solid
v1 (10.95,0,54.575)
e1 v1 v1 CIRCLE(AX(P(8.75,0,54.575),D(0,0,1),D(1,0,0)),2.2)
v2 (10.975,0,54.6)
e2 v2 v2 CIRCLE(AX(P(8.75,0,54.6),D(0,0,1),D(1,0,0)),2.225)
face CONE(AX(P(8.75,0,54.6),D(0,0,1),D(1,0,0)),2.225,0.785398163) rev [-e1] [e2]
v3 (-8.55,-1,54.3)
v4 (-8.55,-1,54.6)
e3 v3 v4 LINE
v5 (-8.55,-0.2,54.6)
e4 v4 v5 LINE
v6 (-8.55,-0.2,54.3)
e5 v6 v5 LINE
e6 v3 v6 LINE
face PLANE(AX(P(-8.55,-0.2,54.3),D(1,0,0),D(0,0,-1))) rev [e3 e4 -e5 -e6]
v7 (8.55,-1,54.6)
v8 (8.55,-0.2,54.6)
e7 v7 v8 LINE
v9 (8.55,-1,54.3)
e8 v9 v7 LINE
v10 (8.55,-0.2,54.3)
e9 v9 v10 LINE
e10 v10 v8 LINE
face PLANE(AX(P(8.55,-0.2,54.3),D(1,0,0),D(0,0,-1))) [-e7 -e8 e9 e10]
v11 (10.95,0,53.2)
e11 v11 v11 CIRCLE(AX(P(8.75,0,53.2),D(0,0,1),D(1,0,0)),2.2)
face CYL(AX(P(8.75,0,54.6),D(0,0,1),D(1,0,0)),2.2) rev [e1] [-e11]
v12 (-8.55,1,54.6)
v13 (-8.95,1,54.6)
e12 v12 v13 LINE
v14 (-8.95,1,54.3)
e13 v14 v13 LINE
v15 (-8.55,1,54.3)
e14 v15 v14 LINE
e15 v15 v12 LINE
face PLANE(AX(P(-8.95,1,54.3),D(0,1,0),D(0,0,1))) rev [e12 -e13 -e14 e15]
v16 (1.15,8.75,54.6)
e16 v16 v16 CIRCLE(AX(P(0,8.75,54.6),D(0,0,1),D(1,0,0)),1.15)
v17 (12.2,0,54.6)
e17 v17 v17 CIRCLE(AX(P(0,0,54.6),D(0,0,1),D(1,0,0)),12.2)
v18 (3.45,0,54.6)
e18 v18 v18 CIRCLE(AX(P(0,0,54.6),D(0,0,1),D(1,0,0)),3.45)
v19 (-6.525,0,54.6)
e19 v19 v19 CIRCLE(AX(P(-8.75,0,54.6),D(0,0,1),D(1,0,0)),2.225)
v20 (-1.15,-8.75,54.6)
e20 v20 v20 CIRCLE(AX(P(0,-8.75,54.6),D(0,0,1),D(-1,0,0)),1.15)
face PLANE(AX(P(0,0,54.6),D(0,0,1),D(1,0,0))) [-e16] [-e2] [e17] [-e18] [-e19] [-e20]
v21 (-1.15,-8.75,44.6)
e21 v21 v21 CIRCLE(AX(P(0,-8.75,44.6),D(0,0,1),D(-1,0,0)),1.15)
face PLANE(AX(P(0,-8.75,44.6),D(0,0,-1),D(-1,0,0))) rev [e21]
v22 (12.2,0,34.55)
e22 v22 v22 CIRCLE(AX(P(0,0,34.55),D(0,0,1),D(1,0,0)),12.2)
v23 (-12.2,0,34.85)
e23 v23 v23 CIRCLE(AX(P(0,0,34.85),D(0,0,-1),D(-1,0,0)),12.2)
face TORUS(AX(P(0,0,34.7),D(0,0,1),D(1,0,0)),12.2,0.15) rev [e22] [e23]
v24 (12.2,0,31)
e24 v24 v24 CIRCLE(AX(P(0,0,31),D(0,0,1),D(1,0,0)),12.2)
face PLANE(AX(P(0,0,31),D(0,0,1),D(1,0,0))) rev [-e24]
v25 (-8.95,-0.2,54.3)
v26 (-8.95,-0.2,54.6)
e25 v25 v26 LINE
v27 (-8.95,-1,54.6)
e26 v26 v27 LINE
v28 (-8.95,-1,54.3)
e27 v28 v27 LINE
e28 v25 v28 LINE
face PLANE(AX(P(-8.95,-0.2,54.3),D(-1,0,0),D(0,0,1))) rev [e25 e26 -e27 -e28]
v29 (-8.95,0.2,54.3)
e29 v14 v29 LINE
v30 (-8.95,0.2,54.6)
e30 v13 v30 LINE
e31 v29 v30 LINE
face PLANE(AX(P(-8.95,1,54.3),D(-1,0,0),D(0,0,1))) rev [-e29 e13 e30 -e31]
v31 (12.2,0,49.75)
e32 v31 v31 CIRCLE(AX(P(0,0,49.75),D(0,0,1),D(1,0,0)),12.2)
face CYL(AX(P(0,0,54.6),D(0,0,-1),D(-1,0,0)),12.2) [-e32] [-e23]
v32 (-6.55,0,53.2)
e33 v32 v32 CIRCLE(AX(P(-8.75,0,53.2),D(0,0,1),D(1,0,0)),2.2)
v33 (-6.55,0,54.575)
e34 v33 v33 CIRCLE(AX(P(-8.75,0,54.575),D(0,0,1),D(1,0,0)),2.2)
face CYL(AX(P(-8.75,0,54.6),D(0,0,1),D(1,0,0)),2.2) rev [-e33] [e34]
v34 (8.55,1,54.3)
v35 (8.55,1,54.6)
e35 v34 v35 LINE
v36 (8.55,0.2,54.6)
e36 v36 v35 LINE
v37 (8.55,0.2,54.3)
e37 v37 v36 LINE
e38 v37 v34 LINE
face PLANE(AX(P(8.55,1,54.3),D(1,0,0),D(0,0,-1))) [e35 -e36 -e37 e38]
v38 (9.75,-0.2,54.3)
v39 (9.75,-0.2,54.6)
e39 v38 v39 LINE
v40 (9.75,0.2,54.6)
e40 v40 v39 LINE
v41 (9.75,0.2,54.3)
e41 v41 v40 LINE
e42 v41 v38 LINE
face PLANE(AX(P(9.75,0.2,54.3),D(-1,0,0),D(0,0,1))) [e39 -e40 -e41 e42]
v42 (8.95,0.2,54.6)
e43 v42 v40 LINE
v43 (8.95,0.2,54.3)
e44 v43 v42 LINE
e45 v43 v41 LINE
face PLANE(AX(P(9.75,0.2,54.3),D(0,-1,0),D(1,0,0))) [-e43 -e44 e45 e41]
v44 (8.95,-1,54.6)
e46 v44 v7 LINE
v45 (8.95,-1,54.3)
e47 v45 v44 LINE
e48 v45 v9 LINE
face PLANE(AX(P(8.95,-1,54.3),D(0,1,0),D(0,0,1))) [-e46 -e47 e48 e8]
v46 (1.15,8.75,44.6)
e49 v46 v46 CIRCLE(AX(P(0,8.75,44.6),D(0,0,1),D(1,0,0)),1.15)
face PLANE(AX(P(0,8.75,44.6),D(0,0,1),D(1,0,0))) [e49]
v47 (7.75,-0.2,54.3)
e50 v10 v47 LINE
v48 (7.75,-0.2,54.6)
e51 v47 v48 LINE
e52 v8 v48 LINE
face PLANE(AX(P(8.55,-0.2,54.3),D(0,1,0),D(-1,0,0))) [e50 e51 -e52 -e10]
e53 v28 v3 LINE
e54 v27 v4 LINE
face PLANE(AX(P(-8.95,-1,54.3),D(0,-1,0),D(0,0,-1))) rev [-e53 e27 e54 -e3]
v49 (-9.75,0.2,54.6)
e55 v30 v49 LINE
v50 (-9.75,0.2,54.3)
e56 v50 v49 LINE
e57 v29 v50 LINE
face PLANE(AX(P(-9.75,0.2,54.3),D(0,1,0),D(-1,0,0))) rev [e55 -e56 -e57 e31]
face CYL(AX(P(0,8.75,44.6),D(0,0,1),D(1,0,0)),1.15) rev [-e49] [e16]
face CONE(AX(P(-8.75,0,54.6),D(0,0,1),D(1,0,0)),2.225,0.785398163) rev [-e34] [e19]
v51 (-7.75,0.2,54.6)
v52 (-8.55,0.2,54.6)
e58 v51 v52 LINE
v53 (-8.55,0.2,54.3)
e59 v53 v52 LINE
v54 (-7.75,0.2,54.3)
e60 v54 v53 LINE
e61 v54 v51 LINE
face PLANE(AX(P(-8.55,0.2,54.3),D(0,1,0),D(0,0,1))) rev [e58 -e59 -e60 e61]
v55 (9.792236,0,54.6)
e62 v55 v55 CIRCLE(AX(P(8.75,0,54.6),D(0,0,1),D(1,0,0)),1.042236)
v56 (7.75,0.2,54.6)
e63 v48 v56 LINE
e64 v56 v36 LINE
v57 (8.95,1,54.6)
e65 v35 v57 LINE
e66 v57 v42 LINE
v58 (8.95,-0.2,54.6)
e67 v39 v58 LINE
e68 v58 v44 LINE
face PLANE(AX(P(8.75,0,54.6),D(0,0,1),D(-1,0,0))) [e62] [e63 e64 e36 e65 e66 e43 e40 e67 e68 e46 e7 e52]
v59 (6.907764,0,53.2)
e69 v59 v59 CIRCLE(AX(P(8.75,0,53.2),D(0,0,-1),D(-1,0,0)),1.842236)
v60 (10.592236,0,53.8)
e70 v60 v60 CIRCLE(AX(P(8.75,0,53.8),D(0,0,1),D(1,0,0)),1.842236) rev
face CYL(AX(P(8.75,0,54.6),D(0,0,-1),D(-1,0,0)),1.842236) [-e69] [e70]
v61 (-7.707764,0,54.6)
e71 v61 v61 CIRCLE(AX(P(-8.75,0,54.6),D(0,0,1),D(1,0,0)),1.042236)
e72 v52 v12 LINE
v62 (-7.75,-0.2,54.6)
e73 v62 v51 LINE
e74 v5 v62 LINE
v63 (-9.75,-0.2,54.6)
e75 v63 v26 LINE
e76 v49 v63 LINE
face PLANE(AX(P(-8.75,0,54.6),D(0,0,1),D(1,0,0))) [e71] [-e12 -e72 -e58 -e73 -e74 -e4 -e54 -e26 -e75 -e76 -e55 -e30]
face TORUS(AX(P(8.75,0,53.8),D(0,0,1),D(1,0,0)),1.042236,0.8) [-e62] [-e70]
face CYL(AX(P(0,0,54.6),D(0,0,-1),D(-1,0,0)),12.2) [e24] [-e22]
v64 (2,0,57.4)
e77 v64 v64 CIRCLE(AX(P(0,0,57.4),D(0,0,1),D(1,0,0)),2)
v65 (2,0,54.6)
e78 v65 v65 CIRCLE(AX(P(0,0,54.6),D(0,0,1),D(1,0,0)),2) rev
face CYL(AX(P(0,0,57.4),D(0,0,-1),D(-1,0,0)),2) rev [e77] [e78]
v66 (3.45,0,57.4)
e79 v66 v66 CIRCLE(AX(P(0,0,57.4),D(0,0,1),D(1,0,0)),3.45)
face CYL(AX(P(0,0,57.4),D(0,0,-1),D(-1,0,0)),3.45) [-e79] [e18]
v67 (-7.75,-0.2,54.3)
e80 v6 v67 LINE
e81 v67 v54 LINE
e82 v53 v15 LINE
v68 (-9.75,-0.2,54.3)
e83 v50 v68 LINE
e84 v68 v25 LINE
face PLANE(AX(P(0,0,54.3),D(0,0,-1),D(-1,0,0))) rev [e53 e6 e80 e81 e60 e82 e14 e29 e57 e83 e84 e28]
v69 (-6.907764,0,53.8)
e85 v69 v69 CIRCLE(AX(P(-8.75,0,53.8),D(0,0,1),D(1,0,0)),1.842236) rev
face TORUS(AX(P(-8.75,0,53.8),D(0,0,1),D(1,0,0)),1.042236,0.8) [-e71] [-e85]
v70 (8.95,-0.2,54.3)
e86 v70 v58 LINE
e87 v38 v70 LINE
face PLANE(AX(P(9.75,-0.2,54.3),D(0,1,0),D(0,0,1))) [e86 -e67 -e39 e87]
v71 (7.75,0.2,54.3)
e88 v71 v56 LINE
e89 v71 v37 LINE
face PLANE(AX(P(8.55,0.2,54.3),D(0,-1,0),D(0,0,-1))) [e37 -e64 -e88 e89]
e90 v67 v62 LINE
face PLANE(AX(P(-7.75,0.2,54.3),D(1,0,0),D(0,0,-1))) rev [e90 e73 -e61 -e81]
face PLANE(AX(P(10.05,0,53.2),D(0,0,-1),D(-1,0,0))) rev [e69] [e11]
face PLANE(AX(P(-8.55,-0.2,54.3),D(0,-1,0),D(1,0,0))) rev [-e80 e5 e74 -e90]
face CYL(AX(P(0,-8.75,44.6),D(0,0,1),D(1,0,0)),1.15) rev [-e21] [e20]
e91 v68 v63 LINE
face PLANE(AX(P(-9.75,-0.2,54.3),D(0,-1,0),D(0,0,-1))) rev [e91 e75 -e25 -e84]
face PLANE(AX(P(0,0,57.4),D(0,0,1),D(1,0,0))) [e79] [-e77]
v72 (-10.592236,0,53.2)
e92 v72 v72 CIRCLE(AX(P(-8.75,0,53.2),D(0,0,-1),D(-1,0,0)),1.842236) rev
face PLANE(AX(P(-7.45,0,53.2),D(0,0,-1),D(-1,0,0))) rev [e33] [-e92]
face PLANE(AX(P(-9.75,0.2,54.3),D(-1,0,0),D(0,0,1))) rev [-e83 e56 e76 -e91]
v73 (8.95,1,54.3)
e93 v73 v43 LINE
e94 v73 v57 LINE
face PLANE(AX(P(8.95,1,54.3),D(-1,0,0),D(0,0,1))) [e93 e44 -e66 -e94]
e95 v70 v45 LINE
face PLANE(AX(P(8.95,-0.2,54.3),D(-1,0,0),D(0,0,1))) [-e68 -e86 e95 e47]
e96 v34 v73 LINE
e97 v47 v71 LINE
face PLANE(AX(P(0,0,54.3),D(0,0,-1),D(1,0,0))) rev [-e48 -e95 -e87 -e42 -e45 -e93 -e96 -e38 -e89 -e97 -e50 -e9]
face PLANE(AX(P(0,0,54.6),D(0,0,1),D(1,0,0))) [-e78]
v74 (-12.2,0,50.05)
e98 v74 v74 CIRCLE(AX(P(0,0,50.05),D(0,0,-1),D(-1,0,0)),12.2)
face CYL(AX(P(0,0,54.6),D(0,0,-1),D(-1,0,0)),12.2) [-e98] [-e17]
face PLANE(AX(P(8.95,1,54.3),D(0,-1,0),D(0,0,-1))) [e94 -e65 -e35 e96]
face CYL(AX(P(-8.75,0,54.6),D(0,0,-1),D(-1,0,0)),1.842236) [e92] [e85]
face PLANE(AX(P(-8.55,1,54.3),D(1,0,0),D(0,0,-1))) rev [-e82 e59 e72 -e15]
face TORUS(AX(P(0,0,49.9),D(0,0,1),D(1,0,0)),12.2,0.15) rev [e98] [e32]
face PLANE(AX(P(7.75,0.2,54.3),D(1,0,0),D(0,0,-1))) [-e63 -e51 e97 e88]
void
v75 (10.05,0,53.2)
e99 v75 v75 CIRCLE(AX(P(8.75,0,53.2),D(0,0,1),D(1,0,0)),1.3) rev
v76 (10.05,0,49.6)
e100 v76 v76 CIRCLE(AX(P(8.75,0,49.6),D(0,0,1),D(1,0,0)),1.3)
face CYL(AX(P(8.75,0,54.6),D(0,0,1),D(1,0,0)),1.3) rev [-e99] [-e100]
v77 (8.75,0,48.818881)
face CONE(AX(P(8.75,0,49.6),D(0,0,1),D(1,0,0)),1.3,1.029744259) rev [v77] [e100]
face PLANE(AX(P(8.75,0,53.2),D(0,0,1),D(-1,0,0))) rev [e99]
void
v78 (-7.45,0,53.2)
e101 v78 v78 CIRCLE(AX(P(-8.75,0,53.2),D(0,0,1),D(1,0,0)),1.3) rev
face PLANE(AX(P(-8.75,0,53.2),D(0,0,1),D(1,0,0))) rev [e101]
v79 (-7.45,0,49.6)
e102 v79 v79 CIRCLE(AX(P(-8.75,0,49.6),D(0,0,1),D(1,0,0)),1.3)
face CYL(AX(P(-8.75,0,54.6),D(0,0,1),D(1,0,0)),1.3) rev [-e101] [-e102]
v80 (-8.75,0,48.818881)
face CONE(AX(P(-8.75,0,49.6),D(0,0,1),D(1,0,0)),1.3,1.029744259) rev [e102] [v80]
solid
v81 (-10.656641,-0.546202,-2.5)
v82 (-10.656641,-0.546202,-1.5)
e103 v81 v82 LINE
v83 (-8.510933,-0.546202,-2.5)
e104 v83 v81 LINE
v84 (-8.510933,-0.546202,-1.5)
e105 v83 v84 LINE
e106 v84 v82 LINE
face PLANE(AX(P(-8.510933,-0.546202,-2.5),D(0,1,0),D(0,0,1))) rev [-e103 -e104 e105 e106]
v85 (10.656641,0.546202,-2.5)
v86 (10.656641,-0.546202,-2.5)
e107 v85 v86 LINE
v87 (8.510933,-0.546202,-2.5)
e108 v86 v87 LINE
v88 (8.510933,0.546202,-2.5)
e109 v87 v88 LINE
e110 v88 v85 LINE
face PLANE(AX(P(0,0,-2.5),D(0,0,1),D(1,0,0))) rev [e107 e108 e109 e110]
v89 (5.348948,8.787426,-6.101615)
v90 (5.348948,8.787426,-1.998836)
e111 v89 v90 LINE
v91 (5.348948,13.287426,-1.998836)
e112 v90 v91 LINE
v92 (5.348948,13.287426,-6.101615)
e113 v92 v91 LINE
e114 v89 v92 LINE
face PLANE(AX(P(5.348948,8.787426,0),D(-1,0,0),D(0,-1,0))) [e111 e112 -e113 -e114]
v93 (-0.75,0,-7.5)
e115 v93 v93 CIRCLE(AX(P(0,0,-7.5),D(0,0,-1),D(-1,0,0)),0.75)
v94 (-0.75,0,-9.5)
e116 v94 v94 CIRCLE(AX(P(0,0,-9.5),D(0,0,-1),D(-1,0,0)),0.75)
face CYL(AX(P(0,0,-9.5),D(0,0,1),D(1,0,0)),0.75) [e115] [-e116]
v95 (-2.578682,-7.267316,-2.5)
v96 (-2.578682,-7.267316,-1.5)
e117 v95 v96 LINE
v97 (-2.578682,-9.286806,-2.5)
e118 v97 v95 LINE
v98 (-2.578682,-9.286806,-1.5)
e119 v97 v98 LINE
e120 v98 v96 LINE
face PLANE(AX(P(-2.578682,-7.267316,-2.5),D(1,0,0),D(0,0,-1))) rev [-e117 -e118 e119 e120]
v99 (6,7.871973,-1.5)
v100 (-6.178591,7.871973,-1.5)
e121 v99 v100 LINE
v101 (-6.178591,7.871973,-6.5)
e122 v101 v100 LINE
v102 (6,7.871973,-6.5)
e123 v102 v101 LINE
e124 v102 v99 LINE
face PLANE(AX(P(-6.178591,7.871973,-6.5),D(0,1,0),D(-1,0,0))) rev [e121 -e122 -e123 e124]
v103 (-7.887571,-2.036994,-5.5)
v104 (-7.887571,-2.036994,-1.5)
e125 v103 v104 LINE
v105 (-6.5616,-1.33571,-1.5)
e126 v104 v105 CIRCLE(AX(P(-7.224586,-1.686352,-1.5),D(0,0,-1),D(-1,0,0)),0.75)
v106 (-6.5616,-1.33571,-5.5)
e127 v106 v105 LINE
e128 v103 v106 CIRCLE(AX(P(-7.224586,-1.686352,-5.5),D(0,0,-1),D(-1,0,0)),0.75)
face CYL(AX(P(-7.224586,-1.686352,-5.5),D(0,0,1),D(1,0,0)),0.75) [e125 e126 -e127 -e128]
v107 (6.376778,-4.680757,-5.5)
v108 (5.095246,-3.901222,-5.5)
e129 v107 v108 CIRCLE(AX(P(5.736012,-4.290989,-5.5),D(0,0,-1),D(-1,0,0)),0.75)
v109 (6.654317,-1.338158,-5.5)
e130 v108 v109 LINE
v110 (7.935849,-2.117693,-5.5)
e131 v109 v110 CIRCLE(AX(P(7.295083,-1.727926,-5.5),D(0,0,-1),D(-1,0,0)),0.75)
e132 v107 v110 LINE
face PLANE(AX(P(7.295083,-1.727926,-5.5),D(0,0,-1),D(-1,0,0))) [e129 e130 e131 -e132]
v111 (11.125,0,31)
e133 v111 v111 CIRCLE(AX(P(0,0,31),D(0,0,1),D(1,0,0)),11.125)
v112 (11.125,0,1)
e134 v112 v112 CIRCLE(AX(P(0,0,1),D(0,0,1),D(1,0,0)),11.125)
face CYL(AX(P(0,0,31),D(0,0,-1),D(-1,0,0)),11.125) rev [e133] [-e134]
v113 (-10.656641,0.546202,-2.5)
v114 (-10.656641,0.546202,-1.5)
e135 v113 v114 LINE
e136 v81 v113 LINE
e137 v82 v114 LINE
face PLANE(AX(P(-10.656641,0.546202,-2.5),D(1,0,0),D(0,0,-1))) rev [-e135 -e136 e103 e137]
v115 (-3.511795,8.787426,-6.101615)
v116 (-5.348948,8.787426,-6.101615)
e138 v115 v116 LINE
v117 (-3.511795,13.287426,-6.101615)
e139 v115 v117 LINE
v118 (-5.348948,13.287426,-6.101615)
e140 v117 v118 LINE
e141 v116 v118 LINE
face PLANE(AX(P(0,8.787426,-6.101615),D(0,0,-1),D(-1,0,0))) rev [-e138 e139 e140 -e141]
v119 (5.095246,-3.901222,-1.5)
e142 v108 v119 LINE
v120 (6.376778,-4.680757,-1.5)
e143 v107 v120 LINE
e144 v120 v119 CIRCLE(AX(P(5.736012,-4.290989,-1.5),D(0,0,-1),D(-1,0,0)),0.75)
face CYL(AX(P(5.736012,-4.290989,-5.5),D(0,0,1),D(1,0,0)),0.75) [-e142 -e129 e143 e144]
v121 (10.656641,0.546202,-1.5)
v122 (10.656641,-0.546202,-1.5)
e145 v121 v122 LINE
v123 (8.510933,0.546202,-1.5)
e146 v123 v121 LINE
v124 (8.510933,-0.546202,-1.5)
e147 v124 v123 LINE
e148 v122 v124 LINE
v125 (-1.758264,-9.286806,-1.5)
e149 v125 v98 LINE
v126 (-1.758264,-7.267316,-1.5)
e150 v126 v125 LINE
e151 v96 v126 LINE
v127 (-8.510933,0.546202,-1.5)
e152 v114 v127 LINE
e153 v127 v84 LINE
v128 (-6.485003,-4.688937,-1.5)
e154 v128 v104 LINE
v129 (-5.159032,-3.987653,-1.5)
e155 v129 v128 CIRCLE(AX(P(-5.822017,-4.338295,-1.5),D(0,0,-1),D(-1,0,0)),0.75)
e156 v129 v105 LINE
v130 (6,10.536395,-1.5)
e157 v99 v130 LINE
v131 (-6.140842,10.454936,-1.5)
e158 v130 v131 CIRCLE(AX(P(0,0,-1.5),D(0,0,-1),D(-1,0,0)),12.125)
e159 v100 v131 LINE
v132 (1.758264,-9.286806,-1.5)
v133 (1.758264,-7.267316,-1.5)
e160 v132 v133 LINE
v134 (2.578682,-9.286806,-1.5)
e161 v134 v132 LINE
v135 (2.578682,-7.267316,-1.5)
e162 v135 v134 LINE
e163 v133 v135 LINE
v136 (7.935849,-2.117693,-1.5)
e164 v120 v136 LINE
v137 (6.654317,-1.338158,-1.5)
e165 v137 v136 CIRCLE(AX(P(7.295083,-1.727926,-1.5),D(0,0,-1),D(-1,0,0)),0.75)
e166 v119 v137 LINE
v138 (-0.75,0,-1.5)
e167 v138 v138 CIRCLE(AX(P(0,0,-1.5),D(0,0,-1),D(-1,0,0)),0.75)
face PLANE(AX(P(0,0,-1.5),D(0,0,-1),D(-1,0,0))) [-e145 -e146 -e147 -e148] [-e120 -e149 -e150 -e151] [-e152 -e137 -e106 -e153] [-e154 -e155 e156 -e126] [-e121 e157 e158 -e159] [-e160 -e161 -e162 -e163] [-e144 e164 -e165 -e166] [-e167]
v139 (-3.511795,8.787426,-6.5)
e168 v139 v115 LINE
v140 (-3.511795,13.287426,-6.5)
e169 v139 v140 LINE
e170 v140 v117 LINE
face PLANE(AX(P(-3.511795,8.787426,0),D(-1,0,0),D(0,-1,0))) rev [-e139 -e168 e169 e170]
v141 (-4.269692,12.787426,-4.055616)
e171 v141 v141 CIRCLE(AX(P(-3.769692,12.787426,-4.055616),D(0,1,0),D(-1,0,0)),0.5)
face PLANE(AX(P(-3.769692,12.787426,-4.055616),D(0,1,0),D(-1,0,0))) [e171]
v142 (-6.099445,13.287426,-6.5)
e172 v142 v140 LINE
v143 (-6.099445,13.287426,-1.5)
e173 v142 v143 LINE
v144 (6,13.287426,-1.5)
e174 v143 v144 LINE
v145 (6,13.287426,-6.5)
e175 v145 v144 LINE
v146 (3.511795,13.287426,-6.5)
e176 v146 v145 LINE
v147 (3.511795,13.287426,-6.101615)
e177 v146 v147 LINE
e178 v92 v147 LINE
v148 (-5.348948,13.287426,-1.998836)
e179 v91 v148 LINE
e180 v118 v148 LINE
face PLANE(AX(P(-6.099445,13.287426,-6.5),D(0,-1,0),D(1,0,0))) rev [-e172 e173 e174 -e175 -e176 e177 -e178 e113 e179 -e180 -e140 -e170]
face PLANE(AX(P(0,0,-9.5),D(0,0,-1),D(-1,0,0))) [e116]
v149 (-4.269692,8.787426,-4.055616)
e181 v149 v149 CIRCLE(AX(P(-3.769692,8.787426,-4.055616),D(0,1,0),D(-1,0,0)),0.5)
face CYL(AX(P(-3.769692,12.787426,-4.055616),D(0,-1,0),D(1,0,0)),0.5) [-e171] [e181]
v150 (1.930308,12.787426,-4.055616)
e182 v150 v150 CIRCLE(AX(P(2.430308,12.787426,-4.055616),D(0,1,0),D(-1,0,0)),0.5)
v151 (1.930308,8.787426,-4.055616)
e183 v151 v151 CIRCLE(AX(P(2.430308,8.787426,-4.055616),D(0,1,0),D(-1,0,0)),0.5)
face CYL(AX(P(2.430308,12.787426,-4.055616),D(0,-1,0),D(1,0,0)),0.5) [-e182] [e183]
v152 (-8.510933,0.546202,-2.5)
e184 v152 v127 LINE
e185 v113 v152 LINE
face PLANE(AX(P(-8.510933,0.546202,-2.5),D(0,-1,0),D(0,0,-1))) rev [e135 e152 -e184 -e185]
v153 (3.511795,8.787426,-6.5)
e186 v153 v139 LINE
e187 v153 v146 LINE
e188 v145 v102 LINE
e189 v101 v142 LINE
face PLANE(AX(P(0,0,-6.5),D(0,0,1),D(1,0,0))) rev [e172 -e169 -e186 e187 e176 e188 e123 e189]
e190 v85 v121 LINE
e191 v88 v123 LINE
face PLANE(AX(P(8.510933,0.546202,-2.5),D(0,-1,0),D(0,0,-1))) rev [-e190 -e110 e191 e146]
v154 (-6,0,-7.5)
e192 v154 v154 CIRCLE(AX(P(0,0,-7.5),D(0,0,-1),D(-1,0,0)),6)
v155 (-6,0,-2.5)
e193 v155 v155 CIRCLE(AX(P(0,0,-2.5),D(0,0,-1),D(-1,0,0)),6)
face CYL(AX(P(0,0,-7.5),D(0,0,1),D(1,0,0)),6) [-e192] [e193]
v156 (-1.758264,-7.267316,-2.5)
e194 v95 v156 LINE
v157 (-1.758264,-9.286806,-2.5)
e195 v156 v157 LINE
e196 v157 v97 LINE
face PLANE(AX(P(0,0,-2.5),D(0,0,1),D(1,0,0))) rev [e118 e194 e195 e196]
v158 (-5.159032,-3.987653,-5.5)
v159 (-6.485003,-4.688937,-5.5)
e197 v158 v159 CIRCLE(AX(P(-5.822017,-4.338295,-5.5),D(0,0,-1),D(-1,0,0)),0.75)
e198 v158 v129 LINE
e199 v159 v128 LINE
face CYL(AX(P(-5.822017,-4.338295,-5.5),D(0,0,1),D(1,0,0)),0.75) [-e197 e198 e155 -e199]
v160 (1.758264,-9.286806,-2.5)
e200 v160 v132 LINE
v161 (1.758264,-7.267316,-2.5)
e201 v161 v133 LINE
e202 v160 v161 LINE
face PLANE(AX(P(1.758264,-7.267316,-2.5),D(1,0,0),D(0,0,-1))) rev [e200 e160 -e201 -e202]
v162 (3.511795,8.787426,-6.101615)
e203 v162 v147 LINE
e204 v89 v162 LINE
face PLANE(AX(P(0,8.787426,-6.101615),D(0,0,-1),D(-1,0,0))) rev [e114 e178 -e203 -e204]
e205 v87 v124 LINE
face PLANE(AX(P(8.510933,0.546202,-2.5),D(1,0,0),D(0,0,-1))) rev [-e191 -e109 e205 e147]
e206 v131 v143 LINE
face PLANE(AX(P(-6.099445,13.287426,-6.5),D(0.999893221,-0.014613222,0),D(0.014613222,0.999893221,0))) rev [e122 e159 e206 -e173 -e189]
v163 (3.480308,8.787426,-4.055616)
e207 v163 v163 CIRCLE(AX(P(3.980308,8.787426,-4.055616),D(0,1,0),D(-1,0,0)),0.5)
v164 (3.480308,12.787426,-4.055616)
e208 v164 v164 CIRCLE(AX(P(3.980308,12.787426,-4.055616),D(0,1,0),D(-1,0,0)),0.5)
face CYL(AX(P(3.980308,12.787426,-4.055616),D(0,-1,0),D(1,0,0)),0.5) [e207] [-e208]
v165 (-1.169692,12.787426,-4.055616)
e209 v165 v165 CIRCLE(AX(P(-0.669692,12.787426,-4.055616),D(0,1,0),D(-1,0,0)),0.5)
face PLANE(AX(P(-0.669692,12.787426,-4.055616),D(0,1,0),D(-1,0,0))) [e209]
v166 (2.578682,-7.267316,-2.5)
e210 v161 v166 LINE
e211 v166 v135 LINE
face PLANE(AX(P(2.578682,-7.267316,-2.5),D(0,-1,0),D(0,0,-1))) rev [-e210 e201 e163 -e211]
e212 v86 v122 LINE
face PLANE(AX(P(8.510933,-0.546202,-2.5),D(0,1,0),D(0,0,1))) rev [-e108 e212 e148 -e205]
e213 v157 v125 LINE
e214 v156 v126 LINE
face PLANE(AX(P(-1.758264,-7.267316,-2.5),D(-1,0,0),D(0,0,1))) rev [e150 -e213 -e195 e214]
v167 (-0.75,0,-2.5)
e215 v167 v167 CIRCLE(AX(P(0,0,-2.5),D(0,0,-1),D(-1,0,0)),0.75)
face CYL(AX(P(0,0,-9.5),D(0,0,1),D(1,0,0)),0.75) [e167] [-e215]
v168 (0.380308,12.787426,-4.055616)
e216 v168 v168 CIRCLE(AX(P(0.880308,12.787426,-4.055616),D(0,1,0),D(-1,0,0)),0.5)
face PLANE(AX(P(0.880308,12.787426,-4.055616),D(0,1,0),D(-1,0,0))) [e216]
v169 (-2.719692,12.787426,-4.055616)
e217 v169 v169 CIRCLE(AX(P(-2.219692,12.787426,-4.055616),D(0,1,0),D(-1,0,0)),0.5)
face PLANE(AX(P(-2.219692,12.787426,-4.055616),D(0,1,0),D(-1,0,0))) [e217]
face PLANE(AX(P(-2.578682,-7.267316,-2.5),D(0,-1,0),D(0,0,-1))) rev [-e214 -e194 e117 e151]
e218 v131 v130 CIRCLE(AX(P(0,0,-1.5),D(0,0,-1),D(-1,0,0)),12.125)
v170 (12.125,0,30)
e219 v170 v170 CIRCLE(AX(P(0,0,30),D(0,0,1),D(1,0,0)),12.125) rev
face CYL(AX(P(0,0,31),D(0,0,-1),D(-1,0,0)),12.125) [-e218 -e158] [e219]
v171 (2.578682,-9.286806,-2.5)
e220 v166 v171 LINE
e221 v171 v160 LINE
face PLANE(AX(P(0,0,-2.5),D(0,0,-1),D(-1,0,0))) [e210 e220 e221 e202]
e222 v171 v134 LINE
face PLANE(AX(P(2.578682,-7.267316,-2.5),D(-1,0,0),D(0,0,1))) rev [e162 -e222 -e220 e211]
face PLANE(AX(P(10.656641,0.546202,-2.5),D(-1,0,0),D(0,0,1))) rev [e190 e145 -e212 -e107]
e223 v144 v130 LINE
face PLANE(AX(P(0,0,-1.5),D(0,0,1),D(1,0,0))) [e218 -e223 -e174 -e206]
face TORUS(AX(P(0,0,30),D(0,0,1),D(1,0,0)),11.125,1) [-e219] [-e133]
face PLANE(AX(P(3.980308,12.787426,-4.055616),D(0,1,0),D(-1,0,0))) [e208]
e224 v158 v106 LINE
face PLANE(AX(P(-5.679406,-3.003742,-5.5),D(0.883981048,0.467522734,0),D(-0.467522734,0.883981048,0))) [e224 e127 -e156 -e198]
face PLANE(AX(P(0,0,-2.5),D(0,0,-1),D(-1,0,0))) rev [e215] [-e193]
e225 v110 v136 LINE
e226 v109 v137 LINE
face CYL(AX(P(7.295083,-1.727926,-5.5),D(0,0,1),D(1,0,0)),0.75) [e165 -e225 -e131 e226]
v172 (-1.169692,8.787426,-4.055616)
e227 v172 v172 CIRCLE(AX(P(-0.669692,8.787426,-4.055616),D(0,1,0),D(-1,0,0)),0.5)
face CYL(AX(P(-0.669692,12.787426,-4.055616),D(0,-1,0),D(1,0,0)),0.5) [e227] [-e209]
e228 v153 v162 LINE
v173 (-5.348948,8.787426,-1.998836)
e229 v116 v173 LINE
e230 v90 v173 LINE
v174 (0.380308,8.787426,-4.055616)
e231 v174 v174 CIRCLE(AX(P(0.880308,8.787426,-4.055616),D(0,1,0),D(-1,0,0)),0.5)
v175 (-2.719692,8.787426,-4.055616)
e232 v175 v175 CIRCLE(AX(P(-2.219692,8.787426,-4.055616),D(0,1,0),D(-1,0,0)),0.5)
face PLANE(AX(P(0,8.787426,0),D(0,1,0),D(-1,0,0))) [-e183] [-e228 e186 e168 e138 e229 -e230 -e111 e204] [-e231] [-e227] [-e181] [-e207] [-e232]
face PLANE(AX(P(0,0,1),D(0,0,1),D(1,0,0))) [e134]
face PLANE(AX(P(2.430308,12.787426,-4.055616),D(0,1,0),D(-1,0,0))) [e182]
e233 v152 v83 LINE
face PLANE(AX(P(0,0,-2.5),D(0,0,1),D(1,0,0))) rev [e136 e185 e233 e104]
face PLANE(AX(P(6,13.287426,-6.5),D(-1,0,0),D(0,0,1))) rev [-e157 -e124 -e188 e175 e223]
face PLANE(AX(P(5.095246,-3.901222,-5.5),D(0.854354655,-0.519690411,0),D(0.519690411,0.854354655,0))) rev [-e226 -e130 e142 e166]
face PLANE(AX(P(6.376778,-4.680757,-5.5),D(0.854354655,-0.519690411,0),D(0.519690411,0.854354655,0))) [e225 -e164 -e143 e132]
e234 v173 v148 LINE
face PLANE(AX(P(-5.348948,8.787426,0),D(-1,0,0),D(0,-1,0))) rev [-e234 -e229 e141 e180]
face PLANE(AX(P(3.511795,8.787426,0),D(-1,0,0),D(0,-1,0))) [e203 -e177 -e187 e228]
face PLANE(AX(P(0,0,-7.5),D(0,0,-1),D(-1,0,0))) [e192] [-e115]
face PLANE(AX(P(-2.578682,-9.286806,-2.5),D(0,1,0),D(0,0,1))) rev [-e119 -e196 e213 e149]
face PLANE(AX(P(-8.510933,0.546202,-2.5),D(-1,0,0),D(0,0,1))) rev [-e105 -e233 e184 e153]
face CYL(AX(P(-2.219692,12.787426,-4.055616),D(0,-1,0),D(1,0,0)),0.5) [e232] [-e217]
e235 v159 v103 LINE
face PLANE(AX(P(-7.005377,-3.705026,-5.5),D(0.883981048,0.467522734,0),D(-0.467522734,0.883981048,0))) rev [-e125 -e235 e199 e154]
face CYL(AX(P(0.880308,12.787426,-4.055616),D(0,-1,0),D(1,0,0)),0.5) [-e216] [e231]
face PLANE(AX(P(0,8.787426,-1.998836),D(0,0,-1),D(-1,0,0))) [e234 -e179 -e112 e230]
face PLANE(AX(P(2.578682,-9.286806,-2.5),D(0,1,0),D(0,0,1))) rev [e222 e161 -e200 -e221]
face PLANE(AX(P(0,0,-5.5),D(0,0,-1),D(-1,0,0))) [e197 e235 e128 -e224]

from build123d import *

# Parameters (mm, degrees)
SKETCH1_R                                  = 12.125
BOSS_EXTRUDE1_DEPTH                        = 31
FILLET2_R                                  = 1
SHELL1_START                               = 1
SHELL1_OUTLINE_R                           = 11.125
SHELL1_DEPTH                               = 30
SKETCH11_R                                 = 12.2
BOSS_EXTRUDE4_DEPTH                        = 23.6
SKETCH12_R                                 = 3.45
SKETCH12_R_2                               = 2
BOSS_EXTRUDE5_DEPTH                        = 2.8
SKETCH17_R                                 = 0.15
SKETCH18_R                                 = 1.15
CUT_EXTRUDE7_DEPTH                         = 10
CBORE_FOR_M2_CHEESE_HEAD_SCREW1_AT_2_COUNT = 2
CBORE_FOR_M2_CHEESE_HEAD_SCREW1_AT_2_PITCH = 17.5
SKETCH24_R                                 = 1.842235559
BOSS_EXTRUDE7_DEPTH                        = 1.4
CUT_EXTRUDE9_DEPTH                         = 0.3
FILLET3_R                                  = 0.8
FILLET3_OF_MIRROR2_R                       = 0.8
BOSS_EXTRUDE8_START                        = 1.5
SKETCH26_R                                 = 12.125
BOSS_EXTRUDE8_DEPTH                        = 1.5
BOSS_EXTRUDE9_START                        = 1
SKETCH27_R                                 = 6
BOSS_EXTRUDE9_DEPTH                        = 5
SKETCH28_R                                 = 0.75
BOSS_EXTRUDE10_DEPTH                       = 8
BOSS_EXTRUDE11_DEPTH                       = 5
SKETCH31_W                                 = 7.02358916
SKETCH31_H                                 = 2.353363912
SKETCH31_H_2                               = 0.39838489
CUT_EXTRUDE10_DEPTH                        = 4.5
SKETCH32_R                                 = 0.5
BOSS_EXTRUDE12_DEPTH                       = 4
BOSS_EXTRUDE13_DEPTH                       = 4
SKETCH33_4_W                               = 2.145707953
SKETCH33_4_H                               = 1.092403472
SKETCH33_4_W_2                             = 0.820417747
SKETCH33_4_H_2                             = 2.019489838
BOSS_EXTRUDE14_DEPTH                       = 1


# Read off the part's stored shape, not the designer's step: Shell1
with BuildPart() as part:
    # Sketch1 → Boss-Extrude1 (new body)
    with BuildSketch(Plane.XY):
        Circle(SKETCH1_R)
    extrude(amount=BOSS_EXTRUDE1_DEPTH)

    # Fillet2
    fillet2_edges = [part.edges().sort_by_distance(p)[0] for p in [
        (-12.125, 0, 31),
    ]]
    fillet(fillet2_edges, radius=FILLET2_R)

    # Shell1 outline → Shell1 (cut)
    with BuildSketch(Plane.XY.offset(SHELL1_START)):
        Circle(SHELL1_OUTLINE_R)
    extrude(amount=SHELL1_DEPTH, mode=Mode.SUBTRACT)

    # Sketch26 → Boss-Extrude8 (add)
    with BuildSketch(Plane(origin=(0, 0, 0), x_dir=(-1, 0, 0), z_dir=(0, 0, -1)).offset(BOSS_EXTRUDE8_START)):
        Circle(SKETCH26_R)
    extrude(amount=-BOSS_EXTRUDE8_DEPTH)



with BuildPart() as body_2:
    # Sketch11 → Boss-Extrude4 (new body)
    with BuildSketch(Plane.XY.offset(31)):
        Circle(SKETCH11_R)
    extrude(amount=BOSS_EXTRUDE4_DEPTH)

    # Sketch12 → Boss-Extrude5 (add)
    with BuildSketch(Plane.XY.offset(54.6)):
        Circle(SKETCH12_R)
        Circle(SKETCH12_R_2, mode=Mode.SUBTRACT)
    extrude(amount=BOSS_EXTRUDE5_DEPTH)

    # Sketch17 → Cut-Revolve1 (revolve, cut)
    with BuildSketch(Plane(origin=(0, 0, 0), x_dir=(1, 0, 0), z_dir=(0, 1, 0))):
        with Locations((-12.2, -49.9)):
            Circle(SKETCH17_R)
        with Locations((-12.2, -34.7)):
            Circle(SKETCH17_R)
    revolve(axis=Axis((0, 0, 54.6), (0, 0, -1)), mode=Mode.SUBTRACT)

    # Sketch18 → Cut-Extrude7 (cut)
    with BuildSketch(Plane.XY.offset(54.6)):
        with Locations((0, 8.75)):
            Circle(SKETCH18_R)
        with Locations(Location((0, -8.75, 0), (0, 0, 180))):
            Circle(SKETCH18_R)
    extrude(amount=-CUT_EXTRUDE7_DEPTH, mode=Mode.SUBTRACT)

    # Sketch23 → CBORE for M2 Cheese Head Screw1 (revolve, cut)
    with BuildSketch(Plane(origin=(-8.75, 0, 54.6), x_dir=(0, -1, 0), z_dir=(1, 0, 0))):
        Polygon((0, 0), (0, 5.781118805), (1.3, 5), (1.3, 1.4), (2.2, 1.4), (2.2, 0.025), (2.225, 0), align=None)
    cbore_for_m2_cheese_head_screw1 = revolve(axis=Axis((-8.75, 0, 60.95), (0, 0, -1)), mode=Mode.SUBTRACT)

    # CBORE for M2 Cheese Head Screw1 at 2: CBORE for M2 Cheese Head Screw1 ×2
    with Locations(*[(i * CBORE_FOR_M2_CHEESE_HEAD_SCREW1_AT_2_PITCH, 0, 0) for i in range(1, CBORE_FOR_M2_CHEESE_HEAD_SCREW1_AT_2_COUNT)]):
        add(cbore_for_m2_cheese_head_screw1, mode=Mode.SUBTRACT)

    # Sketch24 → Boss-Extrude7 (add)
    with BuildSketch(Plane.XY.offset(53.2)):
        with Locations(Location((-8.75, 0, 0), (0, 0, 180))):
            Circle(SKETCH24_R)
    boss_extrude7 = extrude(amount=BOSS_EXTRUDE7_DEPTH)

    # Sketch25 → Cut-Extrude9 (cut)
    with BuildSketch(Plane.XY.offset(54.6)):
        Polygon((-8.55, 0.2), (-7.75, 0.2), (-7.75, -0.2), (-8.55, -0.2), (-8.55, -1), (-8.95, -1), (-8.95, -0.2), (-9.75, -0.2), (-9.75, 0.2), (-8.95, 0.2), (-8.95, 1), (-8.55, 1), align=None)
    cut_extrude9 = extrude(amount=-CUT_EXTRUDE9_DEPTH, mode=Mode.SUBTRACT)

    # Fillet3
    fillet3_edges = [body_2.edges().sort_by_distance(p)[0] for p in [
        (-6.907764441, 0, 54.6),
    ]]
    fillet(fillet3_edges, radius=FILLET3_R)

    # Mirror2: Boss-Extrude7, Cut-Extrude9 across plane
    add(boss_extrude7.mirror(Plane(origin=(0, 0, 0), x_dir=(0, 0, 1), z_dir=(1, 0, 0))))
    add(cut_extrude9.mirror(Plane(origin=(0, 0, 0), x_dir=(0, 0, 1), z_dir=(1, 0, 0))), mode=Mode.SUBTRACT)

    # Fillet3 of Mirror2
    fillet3_of_mirror2_edges = [body_2.edges().sort_by_distance(p)[0] for p in [
        (6.907764441, 0, 54.6),
    ]]
    fillet(fillet3_of_mirror2_edges, radius=FILLET3_OF_MIRROR2_R)


with BuildPart() as body_3:
    # Sketch27 → Boss-Extrude9 (new body)
    with BuildSketch(Plane(origin=(0, 0, -1.5), x_dir=(-1, 0, 0), z_dir=(0, 0, -1)).offset(BOSS_EXTRUDE9_START)):
        Circle(SKETCH27_R)
    extrude(amount=BOSS_EXTRUDE9_DEPTH)


with BuildPart() as part_1:
    add(part.part)

    add(body_3.part)  # Boss-Extrude10 merges body 3
    # Sketch28 → Boss-Extrude10 (add)
    with BuildSketch(Plane(origin=(0, 0, -1.5), x_dir=(-1, 0, 0), z_dir=(0, 0, -1))):
        Circle(SKETCH28_R)
    extrude(amount=BOSS_EXTRUDE10_DEPTH)

    # Sketch29 → Boss-Extrude11 (add)
    with BuildSketch(Plane(origin=(0, 0, -1.5), x_dir=(-1, 0, 0), z_dir=(0, 0, -1))):
        Polygon((6.099445351, 13.287426403), (-6, 13.287426403), (-6, 7.871973463), (6.178591018, 7.871973463), align=None)
    extrude(amount=BOSS_EXTRUDE11_DEPTH)

    # Sketch31 → Cut-Extrude10 (cut)
    with BuildSketch(Plane(origin=(0, 13.287426403, 0), x_dir=(1, 0, 0), z_dir=(0, 1, 0))):
        Polygon((5.348948358, 1.998835879), (5.348948358, 6.10161511), (3.51179458, 6.10161511), (3.51179458, 3.748251198), (-3.51179458, 3.748251198), (-3.51179458, 6.10161511), (-5.348948358, 6.10161511), (-5.348948358, 1.998835879), align=None)
        with Locations((0, 4.924933154)):
            Rectangle(SKETCH31_W, SKETCH31_H)
        with Locations((0, 6.300807555)):
            Rectangle(SKETCH31_W, SKETCH31_H_2)
    extrude(amount=-CUT_EXTRUDE10_DEPTH, mode=Mode.SUBTRACT)

    # Sketch32 → Boss-Extrude12 (add)
    with BuildSketch(Plane(origin=(0, 8.787426403, 0), x_dir=(1, 0, 0), z_dir=(0, 1, 0))):
        with Locations(Location((3.980307899, 4.055615649, 0), (0, 0, 180))):
            Circle(SKETCH32_R)
        with Locations(Location((2.430307899, 4.055615649, 0), (0, 0, 180))):
            Circle(SKETCH32_R)
        with Locations(Location((0.880307899, 4.055615649, 0), (0, 0, 180))):
            Circle(SKETCH32_R)
        with Locations(Location((-0.669692101, 4.055615649, 0), (0, 0, 180))):
            Circle(SKETCH32_R)
        with Locations(Location((-2.219692101, 4.055615649, 0), (0, 0, 180))):
            Circle(SKETCH32_R)
        with Locations(Location((-3.769692101, 4.055615649, 0), (0, 0, 180))):
            Circle(SKETCH32_R)
    extrude(amount=BOSS_EXTRUDE12_DEPTH)

    # Sketch33 → Boss-Extrude13 (add)
    with BuildSketch(Plane(origin=(0, 0, -1.5), x_dir=(-1, 0, 0), z_dir=(0, 0, -1))):
        with BuildLine():
            Line((6.485003155, -4.688937379), (7.887571356, -2.036994234))
            ThreePointArc((7.887571356, -2.036994234), (7.57522762, -1.023366398), (6.561599784, -1.335710134))
            Line((6.561599784, -1.335710134), (5.159031583, -3.987653278))
            ThreePointArc((5.159031583, -3.987653278), (5.471375319, -5.001281114), (6.485003155, -4.688937379))
        make_face()
        with BuildLine():
            ThreePointArc((-6.654317468, -1.338157716), (-7.684851268, -1.087159533), (-7.935849451, -2.117693332))
            Line((-7.935849451, -2.117693332), (-6.376778219, -4.680757298))
            ThreePointArc((-6.376778219, -4.680757298), (-5.34624442, -4.931755482), (-5.095246236, -3.901221682))
            Line((-5.095246236, -3.901221682), (-6.654317468, -1.338157716))
        make_face()
    extrude(amount=BOSS_EXTRUDE13_DEPTH)

    # Sketch33<4> → Boss-Extrude14 (add)
    with BuildSketch(Plane(origin=(0, 0, -1.5), x_dir=(-1, 0, 0), z_dir=(0, 0, -1))):
        with BuildLine():
            Line((5.159031583, -3.987653278), (6.561599784, -1.335710134))
            ThreePointArc((6.561599784, -1.335710134), (7.57522762, -1.023366398), (7.887571356, -2.036994234))
            Line((7.887571356, -2.036994234), (6.485003155, -4.688937379))
            ThreePointArc((6.485003155, -4.688937379), (5.471375319, -5.001281114), (5.159031583, -3.987653278))
        make_face()
        with BuildLine():
            Line((-6.376778219, -4.680757298), (-7.935849451, -2.117693332))
            ThreePointArc((-7.935849451, -2.117693332), (-7.684851268, -1.087159533), (-6.654317468, -1.338157716))
            Line((-6.654317468, -1.338157716), (-5.095246236, -3.901221682))
            ThreePointArc((-5.095246236, -3.901221682), (-5.34624442, -4.931755482), (-6.376778219, -4.680757298))
        make_face()
        with Locations((-9.583787275, 0)):
            Rectangle(SKETCH33_4_W, SKETCH33_4_H)
        with Locations((9.583787275, 0)):
            Rectangle(SKETCH33_4_W, SKETCH33_4_H)
        with Locations((2.168473025, -8.277061273)):
            Rectangle(SKETCH33_4_W_2, SKETCH33_4_H_2)
        with Locations((-2.168473025, -8.277061273)):
            Rectangle(SKETCH33_4_W_2, SKETCH33_4_H_2)
    extrude(amount=BOSS_EXTRUDE14_DEPTH)


solid = Compound([body_2.part, part_1.part])
